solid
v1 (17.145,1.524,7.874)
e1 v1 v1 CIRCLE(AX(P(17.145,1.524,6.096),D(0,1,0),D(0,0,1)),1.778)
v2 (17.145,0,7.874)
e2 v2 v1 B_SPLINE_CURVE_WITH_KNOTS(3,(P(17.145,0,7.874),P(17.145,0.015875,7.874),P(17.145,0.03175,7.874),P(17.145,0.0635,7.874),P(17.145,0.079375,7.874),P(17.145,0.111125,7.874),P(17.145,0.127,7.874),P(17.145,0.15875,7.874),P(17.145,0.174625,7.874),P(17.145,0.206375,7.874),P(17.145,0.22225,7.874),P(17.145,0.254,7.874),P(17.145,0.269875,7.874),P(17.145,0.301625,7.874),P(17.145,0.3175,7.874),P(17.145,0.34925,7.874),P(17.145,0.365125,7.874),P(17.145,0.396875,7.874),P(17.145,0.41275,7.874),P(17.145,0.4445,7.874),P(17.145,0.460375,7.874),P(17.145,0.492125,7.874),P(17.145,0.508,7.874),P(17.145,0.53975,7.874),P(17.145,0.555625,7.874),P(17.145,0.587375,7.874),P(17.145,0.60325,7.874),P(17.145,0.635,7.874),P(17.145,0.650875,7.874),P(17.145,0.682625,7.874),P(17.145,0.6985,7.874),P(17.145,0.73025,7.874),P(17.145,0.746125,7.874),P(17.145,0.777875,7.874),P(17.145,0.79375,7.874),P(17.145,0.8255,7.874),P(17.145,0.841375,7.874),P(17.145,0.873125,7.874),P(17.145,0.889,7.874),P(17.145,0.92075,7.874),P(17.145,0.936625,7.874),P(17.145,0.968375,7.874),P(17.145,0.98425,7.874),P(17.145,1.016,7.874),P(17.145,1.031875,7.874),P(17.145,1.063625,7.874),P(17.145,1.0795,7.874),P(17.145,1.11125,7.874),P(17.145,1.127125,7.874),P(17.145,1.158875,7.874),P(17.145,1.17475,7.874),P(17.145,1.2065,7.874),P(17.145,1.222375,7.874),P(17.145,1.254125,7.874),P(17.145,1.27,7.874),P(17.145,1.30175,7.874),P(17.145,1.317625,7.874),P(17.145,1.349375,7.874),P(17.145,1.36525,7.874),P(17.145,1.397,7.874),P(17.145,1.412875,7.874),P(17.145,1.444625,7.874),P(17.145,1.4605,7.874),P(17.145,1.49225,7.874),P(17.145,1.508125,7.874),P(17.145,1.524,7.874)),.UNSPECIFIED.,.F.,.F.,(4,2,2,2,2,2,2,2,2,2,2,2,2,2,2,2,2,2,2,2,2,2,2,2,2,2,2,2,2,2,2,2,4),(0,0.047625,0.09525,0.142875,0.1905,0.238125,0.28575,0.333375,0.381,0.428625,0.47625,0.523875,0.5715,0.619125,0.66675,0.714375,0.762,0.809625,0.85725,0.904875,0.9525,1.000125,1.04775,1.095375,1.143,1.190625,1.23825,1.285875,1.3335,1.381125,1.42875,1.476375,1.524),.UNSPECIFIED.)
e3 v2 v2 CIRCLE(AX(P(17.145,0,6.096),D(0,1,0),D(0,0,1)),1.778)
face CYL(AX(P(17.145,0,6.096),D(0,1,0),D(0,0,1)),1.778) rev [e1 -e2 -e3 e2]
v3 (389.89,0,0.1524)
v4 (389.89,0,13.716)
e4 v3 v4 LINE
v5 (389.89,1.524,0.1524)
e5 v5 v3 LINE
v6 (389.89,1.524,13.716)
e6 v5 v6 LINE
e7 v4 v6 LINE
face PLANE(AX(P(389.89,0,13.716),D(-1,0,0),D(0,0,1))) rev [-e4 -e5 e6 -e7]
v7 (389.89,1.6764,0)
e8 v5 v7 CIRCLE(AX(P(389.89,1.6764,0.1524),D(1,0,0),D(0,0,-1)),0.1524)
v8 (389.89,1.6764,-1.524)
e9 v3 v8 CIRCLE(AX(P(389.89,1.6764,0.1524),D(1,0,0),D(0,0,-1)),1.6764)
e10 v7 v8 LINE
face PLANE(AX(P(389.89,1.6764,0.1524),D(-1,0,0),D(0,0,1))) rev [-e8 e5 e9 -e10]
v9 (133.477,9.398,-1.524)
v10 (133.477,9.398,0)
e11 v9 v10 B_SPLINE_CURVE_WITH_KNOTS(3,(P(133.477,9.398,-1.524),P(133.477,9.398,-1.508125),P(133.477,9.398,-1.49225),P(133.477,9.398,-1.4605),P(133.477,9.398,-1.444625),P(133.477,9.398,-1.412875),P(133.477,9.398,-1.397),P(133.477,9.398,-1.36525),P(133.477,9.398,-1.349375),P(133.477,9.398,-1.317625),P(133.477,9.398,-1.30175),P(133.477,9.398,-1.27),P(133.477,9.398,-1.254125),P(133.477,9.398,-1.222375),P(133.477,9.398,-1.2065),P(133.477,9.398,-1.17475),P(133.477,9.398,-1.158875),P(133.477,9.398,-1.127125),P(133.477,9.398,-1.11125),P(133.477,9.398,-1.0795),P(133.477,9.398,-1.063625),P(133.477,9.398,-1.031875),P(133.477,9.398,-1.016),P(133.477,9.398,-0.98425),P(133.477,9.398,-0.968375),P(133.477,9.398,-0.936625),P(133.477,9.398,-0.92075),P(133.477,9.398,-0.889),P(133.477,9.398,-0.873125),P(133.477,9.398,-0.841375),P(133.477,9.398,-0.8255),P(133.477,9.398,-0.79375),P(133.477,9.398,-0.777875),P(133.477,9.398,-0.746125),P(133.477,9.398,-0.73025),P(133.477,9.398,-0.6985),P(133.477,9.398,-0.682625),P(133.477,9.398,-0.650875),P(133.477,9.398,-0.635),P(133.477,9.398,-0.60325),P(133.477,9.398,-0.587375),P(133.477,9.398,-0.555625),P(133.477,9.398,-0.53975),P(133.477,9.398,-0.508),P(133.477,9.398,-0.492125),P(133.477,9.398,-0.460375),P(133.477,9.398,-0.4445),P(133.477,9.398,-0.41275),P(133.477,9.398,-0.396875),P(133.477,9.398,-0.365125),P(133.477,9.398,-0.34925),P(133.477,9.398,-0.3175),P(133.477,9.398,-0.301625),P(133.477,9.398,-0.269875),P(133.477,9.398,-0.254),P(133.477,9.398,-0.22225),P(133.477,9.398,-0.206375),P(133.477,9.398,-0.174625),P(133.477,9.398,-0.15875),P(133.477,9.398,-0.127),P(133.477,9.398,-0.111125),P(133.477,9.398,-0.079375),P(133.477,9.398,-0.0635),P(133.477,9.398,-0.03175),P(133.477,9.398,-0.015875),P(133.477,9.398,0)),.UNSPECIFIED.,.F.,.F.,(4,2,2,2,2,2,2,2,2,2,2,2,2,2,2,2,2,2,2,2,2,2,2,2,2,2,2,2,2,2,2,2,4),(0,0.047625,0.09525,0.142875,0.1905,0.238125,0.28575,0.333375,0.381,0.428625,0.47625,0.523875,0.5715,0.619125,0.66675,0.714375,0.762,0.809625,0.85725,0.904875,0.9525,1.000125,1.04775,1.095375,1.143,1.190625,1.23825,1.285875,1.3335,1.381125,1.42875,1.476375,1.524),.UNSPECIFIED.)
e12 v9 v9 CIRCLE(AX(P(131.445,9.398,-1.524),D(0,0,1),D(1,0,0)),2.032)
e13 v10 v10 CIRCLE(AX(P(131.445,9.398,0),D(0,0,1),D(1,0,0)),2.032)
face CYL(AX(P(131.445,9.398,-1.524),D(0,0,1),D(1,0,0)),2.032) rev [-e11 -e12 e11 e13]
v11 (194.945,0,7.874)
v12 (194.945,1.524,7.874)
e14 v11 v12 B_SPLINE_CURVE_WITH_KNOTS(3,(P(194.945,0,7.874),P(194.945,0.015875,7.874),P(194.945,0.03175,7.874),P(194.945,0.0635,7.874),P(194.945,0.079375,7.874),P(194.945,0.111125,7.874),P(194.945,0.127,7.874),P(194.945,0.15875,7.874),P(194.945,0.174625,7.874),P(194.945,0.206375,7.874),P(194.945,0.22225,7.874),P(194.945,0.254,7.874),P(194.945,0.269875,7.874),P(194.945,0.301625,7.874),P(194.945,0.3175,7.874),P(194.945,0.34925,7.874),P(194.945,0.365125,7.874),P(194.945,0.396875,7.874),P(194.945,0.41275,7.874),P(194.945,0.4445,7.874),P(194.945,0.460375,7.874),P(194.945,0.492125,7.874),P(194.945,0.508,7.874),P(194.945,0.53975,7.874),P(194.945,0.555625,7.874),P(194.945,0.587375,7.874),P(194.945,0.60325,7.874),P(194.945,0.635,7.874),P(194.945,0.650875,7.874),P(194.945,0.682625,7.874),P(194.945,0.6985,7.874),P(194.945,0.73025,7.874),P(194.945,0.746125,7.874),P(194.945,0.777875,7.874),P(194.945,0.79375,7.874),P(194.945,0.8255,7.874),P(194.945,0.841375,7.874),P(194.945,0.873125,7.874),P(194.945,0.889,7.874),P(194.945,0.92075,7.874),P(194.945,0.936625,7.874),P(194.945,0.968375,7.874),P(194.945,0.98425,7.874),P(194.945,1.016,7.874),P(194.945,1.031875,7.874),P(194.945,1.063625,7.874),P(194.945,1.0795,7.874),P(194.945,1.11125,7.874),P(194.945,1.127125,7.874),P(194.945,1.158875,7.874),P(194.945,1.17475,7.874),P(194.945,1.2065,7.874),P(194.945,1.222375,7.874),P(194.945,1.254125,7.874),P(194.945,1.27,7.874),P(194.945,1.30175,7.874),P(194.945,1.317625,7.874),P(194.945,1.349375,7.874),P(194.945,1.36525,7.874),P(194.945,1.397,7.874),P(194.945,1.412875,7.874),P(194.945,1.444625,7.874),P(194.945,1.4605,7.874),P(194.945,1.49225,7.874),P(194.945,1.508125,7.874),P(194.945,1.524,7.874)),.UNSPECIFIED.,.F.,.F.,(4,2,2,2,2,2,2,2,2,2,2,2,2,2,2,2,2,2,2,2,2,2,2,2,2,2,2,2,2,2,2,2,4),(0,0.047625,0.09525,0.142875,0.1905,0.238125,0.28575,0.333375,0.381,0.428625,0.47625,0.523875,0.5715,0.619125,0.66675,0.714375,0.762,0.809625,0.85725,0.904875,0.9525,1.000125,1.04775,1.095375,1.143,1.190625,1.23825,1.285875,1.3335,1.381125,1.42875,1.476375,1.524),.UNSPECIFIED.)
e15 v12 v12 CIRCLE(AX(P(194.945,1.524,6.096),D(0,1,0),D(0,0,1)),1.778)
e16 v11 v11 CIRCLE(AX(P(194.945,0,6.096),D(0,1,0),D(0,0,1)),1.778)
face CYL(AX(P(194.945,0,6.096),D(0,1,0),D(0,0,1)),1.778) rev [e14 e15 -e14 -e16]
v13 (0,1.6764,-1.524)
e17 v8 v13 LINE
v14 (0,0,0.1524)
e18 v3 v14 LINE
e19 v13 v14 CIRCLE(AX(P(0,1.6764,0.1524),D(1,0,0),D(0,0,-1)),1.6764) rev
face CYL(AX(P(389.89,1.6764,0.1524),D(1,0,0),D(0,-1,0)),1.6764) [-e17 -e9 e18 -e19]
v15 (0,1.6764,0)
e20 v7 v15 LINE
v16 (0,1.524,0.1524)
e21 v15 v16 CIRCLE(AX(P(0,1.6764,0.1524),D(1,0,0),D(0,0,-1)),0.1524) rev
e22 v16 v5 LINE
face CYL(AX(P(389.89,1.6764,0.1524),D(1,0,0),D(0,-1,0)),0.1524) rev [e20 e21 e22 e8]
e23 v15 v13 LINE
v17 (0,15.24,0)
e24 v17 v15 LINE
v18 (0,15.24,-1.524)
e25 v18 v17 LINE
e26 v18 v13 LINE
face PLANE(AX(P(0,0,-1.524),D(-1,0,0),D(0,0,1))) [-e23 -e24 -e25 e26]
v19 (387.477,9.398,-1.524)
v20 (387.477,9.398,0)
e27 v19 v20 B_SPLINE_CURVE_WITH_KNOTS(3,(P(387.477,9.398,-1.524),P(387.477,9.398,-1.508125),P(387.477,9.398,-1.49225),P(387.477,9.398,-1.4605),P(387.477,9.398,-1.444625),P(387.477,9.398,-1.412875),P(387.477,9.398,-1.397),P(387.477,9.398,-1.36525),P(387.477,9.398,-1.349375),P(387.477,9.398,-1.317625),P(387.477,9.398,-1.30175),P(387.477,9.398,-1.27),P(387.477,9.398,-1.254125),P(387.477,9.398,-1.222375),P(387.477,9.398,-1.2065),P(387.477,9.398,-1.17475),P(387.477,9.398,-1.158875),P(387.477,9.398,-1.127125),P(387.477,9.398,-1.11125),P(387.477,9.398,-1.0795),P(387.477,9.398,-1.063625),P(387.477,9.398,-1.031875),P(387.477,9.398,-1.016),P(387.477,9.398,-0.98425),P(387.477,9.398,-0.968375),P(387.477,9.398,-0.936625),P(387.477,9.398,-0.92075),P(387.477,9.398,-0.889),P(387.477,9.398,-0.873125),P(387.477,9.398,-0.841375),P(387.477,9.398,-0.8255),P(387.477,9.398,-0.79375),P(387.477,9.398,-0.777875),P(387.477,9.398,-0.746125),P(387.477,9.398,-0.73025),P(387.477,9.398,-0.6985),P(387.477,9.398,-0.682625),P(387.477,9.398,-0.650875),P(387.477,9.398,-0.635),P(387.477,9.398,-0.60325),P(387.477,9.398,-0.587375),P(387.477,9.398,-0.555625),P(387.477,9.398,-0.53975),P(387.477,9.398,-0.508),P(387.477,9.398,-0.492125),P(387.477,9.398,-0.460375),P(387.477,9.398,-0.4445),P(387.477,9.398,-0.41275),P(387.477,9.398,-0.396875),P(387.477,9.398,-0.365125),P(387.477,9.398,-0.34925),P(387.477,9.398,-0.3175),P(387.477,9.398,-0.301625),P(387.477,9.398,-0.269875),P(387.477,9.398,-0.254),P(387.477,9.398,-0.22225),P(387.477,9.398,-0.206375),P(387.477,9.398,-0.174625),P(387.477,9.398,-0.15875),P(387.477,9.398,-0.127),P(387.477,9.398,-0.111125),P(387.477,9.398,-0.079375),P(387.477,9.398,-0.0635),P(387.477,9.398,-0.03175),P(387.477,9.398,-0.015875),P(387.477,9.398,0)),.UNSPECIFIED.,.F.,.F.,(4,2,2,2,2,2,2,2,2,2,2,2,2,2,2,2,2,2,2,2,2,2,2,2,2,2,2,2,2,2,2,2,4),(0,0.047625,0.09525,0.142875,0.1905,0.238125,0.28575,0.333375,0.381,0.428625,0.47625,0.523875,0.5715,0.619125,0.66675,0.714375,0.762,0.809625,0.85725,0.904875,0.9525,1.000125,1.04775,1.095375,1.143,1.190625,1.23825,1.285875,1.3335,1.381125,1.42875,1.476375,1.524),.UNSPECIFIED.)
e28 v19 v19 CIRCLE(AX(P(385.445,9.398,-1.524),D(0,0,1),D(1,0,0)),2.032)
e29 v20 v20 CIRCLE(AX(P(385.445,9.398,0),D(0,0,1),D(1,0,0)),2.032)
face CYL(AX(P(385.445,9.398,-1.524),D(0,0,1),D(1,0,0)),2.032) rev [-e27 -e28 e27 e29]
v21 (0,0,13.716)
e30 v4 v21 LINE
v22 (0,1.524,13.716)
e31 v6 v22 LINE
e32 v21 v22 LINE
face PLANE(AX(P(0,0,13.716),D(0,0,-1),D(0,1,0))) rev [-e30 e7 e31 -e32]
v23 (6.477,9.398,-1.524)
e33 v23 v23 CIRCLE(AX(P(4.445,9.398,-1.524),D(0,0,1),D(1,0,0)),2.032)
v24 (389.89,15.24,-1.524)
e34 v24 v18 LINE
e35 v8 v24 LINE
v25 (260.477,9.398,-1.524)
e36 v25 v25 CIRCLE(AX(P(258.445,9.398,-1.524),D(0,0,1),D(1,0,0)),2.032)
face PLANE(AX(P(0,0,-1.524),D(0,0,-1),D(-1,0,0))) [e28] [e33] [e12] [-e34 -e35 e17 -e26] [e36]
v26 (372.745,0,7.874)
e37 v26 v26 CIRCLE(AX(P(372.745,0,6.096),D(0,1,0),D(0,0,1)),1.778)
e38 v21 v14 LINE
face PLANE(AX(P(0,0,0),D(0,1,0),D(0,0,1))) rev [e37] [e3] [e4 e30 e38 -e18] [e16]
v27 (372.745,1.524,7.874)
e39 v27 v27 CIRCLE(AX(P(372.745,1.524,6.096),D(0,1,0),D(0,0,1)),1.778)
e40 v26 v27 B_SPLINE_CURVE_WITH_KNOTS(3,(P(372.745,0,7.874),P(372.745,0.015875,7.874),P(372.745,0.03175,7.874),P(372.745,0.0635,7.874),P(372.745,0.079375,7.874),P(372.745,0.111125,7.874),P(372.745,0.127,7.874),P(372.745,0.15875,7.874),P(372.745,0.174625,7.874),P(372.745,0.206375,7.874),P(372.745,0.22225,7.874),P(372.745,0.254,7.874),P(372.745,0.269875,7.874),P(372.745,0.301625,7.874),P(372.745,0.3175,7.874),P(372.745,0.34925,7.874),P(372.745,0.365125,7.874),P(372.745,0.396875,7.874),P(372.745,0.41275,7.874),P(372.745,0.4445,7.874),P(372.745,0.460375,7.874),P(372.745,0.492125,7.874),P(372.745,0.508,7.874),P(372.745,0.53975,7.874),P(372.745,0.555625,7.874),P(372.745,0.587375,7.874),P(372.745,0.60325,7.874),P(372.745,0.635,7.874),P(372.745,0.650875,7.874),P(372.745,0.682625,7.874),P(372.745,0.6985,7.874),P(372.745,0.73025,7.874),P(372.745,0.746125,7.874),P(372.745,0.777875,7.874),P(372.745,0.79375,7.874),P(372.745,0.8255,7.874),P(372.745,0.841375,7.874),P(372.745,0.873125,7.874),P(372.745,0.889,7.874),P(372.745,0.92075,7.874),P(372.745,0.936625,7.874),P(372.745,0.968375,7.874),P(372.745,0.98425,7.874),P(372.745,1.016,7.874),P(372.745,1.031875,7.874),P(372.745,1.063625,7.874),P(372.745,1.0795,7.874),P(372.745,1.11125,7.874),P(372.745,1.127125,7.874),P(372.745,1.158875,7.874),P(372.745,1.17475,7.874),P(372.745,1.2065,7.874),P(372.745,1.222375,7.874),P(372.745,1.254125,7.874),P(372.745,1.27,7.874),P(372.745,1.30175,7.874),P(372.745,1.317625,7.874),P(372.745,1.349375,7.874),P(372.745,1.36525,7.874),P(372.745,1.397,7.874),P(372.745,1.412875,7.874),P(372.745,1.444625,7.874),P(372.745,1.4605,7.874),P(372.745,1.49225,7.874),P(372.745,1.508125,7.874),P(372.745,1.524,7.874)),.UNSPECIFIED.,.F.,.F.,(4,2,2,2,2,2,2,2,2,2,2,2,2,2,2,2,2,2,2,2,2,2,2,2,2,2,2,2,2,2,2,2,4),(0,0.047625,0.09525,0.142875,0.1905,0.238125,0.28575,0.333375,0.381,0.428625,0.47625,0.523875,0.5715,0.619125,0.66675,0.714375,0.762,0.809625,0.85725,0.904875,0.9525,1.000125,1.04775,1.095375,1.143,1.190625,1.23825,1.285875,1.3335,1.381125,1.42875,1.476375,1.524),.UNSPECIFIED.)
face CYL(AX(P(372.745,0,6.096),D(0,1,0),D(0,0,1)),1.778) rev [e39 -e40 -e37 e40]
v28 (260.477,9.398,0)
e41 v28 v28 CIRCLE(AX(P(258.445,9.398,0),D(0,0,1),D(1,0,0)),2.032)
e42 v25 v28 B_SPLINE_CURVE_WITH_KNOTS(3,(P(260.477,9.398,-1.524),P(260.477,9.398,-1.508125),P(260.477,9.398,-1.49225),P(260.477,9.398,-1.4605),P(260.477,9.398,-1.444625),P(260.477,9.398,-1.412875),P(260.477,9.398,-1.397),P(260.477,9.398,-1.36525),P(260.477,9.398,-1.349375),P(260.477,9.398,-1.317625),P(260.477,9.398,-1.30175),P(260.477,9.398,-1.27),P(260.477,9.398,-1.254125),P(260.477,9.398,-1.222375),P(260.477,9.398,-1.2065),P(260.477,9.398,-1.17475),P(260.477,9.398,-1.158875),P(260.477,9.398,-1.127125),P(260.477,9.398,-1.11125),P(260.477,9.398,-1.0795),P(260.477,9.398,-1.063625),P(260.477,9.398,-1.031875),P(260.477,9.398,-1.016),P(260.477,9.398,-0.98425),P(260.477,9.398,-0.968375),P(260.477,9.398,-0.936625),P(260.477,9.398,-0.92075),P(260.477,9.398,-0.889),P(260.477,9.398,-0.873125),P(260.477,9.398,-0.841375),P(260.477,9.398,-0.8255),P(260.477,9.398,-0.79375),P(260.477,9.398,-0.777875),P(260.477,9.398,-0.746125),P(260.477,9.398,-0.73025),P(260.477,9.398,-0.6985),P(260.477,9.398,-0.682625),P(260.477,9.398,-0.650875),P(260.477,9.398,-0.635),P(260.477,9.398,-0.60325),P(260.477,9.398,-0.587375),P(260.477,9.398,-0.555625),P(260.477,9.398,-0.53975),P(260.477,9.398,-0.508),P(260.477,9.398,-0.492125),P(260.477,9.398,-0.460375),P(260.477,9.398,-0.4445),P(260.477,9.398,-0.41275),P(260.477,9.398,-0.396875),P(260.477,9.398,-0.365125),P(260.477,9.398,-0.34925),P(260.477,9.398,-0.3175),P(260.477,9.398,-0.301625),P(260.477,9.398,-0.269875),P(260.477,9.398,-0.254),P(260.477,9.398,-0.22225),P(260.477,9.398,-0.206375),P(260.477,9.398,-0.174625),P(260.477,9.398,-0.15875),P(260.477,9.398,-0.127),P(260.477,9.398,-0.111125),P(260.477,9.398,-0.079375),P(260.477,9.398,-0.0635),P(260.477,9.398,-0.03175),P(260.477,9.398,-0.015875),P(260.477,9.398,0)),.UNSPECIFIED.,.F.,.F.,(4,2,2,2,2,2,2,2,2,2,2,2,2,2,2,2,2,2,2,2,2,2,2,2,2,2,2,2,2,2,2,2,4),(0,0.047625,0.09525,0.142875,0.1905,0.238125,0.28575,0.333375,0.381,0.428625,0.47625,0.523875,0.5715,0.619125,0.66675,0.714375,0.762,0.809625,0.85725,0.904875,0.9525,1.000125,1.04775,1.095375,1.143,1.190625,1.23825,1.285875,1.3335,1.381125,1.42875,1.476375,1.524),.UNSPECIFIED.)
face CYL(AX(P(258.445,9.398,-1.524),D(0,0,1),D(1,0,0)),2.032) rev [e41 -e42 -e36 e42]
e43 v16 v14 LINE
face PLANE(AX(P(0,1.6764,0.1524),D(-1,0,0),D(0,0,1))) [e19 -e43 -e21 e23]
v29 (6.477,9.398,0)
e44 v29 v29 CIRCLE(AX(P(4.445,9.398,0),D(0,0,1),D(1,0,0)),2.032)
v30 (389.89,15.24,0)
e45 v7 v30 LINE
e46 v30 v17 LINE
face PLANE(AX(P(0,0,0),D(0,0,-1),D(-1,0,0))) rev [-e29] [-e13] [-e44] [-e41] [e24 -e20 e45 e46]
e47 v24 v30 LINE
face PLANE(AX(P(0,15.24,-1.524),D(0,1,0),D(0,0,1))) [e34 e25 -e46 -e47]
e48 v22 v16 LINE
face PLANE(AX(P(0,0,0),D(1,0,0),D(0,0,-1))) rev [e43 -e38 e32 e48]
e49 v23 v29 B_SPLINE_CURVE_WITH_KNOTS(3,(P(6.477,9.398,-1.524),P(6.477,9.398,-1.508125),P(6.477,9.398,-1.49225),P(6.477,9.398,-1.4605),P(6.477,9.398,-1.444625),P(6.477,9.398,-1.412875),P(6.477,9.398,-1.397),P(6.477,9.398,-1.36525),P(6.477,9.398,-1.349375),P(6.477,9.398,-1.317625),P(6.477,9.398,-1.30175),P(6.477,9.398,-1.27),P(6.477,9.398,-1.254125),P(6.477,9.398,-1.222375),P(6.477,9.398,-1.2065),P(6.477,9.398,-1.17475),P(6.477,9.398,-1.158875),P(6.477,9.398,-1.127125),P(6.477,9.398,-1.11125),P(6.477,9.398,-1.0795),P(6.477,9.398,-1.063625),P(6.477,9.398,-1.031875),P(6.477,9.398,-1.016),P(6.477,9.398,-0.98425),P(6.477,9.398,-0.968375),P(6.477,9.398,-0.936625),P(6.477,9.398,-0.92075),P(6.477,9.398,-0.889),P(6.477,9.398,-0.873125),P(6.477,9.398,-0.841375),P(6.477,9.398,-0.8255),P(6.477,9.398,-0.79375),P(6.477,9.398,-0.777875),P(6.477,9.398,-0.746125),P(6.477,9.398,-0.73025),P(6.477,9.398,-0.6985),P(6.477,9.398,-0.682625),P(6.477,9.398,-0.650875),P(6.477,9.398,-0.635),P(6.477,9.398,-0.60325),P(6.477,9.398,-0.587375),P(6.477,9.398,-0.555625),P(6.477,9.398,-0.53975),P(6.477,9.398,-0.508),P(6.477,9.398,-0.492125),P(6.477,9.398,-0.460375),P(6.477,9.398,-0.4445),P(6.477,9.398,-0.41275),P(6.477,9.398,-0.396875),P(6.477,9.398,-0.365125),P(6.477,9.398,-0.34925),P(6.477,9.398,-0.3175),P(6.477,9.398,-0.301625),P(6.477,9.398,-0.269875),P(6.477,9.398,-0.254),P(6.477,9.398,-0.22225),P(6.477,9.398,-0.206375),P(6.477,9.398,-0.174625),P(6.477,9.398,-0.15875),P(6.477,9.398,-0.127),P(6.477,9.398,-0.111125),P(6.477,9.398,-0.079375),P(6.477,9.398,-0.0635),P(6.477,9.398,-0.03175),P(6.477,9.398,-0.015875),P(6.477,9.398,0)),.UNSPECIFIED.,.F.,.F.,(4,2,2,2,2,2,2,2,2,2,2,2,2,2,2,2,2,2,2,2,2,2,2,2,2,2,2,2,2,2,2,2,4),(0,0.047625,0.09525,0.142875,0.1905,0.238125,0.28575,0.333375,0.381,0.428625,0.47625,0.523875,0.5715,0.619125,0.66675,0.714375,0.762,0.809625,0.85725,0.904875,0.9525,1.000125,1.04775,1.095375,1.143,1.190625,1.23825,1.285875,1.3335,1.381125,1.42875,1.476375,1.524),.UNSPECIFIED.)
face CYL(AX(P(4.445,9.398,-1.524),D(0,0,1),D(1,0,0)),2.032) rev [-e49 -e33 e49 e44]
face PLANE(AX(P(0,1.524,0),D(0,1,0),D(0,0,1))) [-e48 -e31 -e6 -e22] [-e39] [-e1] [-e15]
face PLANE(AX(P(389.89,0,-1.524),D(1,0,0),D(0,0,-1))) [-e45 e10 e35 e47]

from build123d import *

# Parameters (mm, degrees)
SKETCH1_W                    = 389.89
SKETCH1_H                    = 15.24
BASE_FLANGE1_DEPTH           = 1.524
EDGE_FLANGE1_STRIP_W         = 6.4008
EDGE_FLANGE1_STRIP_H         = 1.524
EDGE_FLANGE1_STRIP_CUT_DEPTH = 389.89
EDGE_FLANGE1_DEPTH           = 389.89
SKETCH9_R                    = 2.032
CUT_EXTRUDE1_DEPTH           = 2.54
SKETCH10_R                   = 1.778
CUT_EXTRUDE2_DEPTH           = 2.54


# Sheet-metal steps are written as plain solids
with BuildPart() as part:
    # Sketch1 → Base-Flange1 (new body)
    with BuildSketch(Plane.XY):
        with Locations((194.945, 7.62)):
            Rectangle(SKETCH1_W, SKETCH1_H)
    extrude(amount=-BASE_FLANGE1_DEPTH)

    # Edge-Flange1 strip (across the edge) → Edge-Flange1 strip cut (cut)
    with BuildSketch(Plane.YZ):
        with Locations((-1.524, -0.762)):
            Rectangle(EDGE_FLANGE1_STRIP_W, EDGE_FLANGE1_STRIP_H)
    extrude(amount=EDGE_FLANGE1_STRIP_CUT_DEPTH, mode=Mode.SUBTRACT)

    # Edge-Flange1 section (across the edge) → Edge-Flange1 (add)
    with BuildSketch(Plane.YZ):
        with BuildLine():
            Line((0, 0.1524), (0, 13.716))
            Line((0, 13.716), (1.524, 13.716))
            Line((1.524, 13.716), (1.524, 0.1524))
            ThreePointArc((1.524, 0.1524), (1.568636927, 0.044636927), (1.6764, 0))
            Line((1.6764, 0), (1.6764, -1.524))
            ThreePointArc((1.6764, -1.524), (0.491006192, -1.032993808), (0, 0.1524))
        make_face()
    extrude(amount=EDGE_FLANGE1_DEPTH)

    # Sketch9 → Cut-Extrude1 (cut)
    with BuildSketch(Plane.XY):
        with Locations((4.445, 9.398)):
            Circle(SKETCH9_R)
        with Locations((131.445, 9.398)):
            Circle(SKETCH9_R)
        with Locations((258.445, 9.398)):
            Circle(SKETCH9_R)
        with Locations((385.445, 9.398)):
            Circle(SKETCH9_R)
    extrude(amount=-CUT_EXTRUDE1_DEPTH, mode=Mode.SUBTRACT)

    # Sketch10 → Cut-Extrude2 (cut)
    with BuildSketch(Plane(origin=(0, 1.524, 0), x_dir=(1, 0, 0), z_dir=(0, 1, 0))):
        with Locations(Location((372.745, -6.096, 0), (0, 0, 270))):
            Circle(SKETCH10_R)
        with Locations(Location((194.945, -6.096, 0), (0, 0, 270))):
            Circle(SKETCH10_R)
        with Locations(Location((17.145, -6.096, 0), (0, 0, 270))):
            Circle(SKETCH10_R)
    extrude(amount=-CUT_EXTRUDE2_DEPTH, mode=Mode.SUBTRACT)


solid = part.part
